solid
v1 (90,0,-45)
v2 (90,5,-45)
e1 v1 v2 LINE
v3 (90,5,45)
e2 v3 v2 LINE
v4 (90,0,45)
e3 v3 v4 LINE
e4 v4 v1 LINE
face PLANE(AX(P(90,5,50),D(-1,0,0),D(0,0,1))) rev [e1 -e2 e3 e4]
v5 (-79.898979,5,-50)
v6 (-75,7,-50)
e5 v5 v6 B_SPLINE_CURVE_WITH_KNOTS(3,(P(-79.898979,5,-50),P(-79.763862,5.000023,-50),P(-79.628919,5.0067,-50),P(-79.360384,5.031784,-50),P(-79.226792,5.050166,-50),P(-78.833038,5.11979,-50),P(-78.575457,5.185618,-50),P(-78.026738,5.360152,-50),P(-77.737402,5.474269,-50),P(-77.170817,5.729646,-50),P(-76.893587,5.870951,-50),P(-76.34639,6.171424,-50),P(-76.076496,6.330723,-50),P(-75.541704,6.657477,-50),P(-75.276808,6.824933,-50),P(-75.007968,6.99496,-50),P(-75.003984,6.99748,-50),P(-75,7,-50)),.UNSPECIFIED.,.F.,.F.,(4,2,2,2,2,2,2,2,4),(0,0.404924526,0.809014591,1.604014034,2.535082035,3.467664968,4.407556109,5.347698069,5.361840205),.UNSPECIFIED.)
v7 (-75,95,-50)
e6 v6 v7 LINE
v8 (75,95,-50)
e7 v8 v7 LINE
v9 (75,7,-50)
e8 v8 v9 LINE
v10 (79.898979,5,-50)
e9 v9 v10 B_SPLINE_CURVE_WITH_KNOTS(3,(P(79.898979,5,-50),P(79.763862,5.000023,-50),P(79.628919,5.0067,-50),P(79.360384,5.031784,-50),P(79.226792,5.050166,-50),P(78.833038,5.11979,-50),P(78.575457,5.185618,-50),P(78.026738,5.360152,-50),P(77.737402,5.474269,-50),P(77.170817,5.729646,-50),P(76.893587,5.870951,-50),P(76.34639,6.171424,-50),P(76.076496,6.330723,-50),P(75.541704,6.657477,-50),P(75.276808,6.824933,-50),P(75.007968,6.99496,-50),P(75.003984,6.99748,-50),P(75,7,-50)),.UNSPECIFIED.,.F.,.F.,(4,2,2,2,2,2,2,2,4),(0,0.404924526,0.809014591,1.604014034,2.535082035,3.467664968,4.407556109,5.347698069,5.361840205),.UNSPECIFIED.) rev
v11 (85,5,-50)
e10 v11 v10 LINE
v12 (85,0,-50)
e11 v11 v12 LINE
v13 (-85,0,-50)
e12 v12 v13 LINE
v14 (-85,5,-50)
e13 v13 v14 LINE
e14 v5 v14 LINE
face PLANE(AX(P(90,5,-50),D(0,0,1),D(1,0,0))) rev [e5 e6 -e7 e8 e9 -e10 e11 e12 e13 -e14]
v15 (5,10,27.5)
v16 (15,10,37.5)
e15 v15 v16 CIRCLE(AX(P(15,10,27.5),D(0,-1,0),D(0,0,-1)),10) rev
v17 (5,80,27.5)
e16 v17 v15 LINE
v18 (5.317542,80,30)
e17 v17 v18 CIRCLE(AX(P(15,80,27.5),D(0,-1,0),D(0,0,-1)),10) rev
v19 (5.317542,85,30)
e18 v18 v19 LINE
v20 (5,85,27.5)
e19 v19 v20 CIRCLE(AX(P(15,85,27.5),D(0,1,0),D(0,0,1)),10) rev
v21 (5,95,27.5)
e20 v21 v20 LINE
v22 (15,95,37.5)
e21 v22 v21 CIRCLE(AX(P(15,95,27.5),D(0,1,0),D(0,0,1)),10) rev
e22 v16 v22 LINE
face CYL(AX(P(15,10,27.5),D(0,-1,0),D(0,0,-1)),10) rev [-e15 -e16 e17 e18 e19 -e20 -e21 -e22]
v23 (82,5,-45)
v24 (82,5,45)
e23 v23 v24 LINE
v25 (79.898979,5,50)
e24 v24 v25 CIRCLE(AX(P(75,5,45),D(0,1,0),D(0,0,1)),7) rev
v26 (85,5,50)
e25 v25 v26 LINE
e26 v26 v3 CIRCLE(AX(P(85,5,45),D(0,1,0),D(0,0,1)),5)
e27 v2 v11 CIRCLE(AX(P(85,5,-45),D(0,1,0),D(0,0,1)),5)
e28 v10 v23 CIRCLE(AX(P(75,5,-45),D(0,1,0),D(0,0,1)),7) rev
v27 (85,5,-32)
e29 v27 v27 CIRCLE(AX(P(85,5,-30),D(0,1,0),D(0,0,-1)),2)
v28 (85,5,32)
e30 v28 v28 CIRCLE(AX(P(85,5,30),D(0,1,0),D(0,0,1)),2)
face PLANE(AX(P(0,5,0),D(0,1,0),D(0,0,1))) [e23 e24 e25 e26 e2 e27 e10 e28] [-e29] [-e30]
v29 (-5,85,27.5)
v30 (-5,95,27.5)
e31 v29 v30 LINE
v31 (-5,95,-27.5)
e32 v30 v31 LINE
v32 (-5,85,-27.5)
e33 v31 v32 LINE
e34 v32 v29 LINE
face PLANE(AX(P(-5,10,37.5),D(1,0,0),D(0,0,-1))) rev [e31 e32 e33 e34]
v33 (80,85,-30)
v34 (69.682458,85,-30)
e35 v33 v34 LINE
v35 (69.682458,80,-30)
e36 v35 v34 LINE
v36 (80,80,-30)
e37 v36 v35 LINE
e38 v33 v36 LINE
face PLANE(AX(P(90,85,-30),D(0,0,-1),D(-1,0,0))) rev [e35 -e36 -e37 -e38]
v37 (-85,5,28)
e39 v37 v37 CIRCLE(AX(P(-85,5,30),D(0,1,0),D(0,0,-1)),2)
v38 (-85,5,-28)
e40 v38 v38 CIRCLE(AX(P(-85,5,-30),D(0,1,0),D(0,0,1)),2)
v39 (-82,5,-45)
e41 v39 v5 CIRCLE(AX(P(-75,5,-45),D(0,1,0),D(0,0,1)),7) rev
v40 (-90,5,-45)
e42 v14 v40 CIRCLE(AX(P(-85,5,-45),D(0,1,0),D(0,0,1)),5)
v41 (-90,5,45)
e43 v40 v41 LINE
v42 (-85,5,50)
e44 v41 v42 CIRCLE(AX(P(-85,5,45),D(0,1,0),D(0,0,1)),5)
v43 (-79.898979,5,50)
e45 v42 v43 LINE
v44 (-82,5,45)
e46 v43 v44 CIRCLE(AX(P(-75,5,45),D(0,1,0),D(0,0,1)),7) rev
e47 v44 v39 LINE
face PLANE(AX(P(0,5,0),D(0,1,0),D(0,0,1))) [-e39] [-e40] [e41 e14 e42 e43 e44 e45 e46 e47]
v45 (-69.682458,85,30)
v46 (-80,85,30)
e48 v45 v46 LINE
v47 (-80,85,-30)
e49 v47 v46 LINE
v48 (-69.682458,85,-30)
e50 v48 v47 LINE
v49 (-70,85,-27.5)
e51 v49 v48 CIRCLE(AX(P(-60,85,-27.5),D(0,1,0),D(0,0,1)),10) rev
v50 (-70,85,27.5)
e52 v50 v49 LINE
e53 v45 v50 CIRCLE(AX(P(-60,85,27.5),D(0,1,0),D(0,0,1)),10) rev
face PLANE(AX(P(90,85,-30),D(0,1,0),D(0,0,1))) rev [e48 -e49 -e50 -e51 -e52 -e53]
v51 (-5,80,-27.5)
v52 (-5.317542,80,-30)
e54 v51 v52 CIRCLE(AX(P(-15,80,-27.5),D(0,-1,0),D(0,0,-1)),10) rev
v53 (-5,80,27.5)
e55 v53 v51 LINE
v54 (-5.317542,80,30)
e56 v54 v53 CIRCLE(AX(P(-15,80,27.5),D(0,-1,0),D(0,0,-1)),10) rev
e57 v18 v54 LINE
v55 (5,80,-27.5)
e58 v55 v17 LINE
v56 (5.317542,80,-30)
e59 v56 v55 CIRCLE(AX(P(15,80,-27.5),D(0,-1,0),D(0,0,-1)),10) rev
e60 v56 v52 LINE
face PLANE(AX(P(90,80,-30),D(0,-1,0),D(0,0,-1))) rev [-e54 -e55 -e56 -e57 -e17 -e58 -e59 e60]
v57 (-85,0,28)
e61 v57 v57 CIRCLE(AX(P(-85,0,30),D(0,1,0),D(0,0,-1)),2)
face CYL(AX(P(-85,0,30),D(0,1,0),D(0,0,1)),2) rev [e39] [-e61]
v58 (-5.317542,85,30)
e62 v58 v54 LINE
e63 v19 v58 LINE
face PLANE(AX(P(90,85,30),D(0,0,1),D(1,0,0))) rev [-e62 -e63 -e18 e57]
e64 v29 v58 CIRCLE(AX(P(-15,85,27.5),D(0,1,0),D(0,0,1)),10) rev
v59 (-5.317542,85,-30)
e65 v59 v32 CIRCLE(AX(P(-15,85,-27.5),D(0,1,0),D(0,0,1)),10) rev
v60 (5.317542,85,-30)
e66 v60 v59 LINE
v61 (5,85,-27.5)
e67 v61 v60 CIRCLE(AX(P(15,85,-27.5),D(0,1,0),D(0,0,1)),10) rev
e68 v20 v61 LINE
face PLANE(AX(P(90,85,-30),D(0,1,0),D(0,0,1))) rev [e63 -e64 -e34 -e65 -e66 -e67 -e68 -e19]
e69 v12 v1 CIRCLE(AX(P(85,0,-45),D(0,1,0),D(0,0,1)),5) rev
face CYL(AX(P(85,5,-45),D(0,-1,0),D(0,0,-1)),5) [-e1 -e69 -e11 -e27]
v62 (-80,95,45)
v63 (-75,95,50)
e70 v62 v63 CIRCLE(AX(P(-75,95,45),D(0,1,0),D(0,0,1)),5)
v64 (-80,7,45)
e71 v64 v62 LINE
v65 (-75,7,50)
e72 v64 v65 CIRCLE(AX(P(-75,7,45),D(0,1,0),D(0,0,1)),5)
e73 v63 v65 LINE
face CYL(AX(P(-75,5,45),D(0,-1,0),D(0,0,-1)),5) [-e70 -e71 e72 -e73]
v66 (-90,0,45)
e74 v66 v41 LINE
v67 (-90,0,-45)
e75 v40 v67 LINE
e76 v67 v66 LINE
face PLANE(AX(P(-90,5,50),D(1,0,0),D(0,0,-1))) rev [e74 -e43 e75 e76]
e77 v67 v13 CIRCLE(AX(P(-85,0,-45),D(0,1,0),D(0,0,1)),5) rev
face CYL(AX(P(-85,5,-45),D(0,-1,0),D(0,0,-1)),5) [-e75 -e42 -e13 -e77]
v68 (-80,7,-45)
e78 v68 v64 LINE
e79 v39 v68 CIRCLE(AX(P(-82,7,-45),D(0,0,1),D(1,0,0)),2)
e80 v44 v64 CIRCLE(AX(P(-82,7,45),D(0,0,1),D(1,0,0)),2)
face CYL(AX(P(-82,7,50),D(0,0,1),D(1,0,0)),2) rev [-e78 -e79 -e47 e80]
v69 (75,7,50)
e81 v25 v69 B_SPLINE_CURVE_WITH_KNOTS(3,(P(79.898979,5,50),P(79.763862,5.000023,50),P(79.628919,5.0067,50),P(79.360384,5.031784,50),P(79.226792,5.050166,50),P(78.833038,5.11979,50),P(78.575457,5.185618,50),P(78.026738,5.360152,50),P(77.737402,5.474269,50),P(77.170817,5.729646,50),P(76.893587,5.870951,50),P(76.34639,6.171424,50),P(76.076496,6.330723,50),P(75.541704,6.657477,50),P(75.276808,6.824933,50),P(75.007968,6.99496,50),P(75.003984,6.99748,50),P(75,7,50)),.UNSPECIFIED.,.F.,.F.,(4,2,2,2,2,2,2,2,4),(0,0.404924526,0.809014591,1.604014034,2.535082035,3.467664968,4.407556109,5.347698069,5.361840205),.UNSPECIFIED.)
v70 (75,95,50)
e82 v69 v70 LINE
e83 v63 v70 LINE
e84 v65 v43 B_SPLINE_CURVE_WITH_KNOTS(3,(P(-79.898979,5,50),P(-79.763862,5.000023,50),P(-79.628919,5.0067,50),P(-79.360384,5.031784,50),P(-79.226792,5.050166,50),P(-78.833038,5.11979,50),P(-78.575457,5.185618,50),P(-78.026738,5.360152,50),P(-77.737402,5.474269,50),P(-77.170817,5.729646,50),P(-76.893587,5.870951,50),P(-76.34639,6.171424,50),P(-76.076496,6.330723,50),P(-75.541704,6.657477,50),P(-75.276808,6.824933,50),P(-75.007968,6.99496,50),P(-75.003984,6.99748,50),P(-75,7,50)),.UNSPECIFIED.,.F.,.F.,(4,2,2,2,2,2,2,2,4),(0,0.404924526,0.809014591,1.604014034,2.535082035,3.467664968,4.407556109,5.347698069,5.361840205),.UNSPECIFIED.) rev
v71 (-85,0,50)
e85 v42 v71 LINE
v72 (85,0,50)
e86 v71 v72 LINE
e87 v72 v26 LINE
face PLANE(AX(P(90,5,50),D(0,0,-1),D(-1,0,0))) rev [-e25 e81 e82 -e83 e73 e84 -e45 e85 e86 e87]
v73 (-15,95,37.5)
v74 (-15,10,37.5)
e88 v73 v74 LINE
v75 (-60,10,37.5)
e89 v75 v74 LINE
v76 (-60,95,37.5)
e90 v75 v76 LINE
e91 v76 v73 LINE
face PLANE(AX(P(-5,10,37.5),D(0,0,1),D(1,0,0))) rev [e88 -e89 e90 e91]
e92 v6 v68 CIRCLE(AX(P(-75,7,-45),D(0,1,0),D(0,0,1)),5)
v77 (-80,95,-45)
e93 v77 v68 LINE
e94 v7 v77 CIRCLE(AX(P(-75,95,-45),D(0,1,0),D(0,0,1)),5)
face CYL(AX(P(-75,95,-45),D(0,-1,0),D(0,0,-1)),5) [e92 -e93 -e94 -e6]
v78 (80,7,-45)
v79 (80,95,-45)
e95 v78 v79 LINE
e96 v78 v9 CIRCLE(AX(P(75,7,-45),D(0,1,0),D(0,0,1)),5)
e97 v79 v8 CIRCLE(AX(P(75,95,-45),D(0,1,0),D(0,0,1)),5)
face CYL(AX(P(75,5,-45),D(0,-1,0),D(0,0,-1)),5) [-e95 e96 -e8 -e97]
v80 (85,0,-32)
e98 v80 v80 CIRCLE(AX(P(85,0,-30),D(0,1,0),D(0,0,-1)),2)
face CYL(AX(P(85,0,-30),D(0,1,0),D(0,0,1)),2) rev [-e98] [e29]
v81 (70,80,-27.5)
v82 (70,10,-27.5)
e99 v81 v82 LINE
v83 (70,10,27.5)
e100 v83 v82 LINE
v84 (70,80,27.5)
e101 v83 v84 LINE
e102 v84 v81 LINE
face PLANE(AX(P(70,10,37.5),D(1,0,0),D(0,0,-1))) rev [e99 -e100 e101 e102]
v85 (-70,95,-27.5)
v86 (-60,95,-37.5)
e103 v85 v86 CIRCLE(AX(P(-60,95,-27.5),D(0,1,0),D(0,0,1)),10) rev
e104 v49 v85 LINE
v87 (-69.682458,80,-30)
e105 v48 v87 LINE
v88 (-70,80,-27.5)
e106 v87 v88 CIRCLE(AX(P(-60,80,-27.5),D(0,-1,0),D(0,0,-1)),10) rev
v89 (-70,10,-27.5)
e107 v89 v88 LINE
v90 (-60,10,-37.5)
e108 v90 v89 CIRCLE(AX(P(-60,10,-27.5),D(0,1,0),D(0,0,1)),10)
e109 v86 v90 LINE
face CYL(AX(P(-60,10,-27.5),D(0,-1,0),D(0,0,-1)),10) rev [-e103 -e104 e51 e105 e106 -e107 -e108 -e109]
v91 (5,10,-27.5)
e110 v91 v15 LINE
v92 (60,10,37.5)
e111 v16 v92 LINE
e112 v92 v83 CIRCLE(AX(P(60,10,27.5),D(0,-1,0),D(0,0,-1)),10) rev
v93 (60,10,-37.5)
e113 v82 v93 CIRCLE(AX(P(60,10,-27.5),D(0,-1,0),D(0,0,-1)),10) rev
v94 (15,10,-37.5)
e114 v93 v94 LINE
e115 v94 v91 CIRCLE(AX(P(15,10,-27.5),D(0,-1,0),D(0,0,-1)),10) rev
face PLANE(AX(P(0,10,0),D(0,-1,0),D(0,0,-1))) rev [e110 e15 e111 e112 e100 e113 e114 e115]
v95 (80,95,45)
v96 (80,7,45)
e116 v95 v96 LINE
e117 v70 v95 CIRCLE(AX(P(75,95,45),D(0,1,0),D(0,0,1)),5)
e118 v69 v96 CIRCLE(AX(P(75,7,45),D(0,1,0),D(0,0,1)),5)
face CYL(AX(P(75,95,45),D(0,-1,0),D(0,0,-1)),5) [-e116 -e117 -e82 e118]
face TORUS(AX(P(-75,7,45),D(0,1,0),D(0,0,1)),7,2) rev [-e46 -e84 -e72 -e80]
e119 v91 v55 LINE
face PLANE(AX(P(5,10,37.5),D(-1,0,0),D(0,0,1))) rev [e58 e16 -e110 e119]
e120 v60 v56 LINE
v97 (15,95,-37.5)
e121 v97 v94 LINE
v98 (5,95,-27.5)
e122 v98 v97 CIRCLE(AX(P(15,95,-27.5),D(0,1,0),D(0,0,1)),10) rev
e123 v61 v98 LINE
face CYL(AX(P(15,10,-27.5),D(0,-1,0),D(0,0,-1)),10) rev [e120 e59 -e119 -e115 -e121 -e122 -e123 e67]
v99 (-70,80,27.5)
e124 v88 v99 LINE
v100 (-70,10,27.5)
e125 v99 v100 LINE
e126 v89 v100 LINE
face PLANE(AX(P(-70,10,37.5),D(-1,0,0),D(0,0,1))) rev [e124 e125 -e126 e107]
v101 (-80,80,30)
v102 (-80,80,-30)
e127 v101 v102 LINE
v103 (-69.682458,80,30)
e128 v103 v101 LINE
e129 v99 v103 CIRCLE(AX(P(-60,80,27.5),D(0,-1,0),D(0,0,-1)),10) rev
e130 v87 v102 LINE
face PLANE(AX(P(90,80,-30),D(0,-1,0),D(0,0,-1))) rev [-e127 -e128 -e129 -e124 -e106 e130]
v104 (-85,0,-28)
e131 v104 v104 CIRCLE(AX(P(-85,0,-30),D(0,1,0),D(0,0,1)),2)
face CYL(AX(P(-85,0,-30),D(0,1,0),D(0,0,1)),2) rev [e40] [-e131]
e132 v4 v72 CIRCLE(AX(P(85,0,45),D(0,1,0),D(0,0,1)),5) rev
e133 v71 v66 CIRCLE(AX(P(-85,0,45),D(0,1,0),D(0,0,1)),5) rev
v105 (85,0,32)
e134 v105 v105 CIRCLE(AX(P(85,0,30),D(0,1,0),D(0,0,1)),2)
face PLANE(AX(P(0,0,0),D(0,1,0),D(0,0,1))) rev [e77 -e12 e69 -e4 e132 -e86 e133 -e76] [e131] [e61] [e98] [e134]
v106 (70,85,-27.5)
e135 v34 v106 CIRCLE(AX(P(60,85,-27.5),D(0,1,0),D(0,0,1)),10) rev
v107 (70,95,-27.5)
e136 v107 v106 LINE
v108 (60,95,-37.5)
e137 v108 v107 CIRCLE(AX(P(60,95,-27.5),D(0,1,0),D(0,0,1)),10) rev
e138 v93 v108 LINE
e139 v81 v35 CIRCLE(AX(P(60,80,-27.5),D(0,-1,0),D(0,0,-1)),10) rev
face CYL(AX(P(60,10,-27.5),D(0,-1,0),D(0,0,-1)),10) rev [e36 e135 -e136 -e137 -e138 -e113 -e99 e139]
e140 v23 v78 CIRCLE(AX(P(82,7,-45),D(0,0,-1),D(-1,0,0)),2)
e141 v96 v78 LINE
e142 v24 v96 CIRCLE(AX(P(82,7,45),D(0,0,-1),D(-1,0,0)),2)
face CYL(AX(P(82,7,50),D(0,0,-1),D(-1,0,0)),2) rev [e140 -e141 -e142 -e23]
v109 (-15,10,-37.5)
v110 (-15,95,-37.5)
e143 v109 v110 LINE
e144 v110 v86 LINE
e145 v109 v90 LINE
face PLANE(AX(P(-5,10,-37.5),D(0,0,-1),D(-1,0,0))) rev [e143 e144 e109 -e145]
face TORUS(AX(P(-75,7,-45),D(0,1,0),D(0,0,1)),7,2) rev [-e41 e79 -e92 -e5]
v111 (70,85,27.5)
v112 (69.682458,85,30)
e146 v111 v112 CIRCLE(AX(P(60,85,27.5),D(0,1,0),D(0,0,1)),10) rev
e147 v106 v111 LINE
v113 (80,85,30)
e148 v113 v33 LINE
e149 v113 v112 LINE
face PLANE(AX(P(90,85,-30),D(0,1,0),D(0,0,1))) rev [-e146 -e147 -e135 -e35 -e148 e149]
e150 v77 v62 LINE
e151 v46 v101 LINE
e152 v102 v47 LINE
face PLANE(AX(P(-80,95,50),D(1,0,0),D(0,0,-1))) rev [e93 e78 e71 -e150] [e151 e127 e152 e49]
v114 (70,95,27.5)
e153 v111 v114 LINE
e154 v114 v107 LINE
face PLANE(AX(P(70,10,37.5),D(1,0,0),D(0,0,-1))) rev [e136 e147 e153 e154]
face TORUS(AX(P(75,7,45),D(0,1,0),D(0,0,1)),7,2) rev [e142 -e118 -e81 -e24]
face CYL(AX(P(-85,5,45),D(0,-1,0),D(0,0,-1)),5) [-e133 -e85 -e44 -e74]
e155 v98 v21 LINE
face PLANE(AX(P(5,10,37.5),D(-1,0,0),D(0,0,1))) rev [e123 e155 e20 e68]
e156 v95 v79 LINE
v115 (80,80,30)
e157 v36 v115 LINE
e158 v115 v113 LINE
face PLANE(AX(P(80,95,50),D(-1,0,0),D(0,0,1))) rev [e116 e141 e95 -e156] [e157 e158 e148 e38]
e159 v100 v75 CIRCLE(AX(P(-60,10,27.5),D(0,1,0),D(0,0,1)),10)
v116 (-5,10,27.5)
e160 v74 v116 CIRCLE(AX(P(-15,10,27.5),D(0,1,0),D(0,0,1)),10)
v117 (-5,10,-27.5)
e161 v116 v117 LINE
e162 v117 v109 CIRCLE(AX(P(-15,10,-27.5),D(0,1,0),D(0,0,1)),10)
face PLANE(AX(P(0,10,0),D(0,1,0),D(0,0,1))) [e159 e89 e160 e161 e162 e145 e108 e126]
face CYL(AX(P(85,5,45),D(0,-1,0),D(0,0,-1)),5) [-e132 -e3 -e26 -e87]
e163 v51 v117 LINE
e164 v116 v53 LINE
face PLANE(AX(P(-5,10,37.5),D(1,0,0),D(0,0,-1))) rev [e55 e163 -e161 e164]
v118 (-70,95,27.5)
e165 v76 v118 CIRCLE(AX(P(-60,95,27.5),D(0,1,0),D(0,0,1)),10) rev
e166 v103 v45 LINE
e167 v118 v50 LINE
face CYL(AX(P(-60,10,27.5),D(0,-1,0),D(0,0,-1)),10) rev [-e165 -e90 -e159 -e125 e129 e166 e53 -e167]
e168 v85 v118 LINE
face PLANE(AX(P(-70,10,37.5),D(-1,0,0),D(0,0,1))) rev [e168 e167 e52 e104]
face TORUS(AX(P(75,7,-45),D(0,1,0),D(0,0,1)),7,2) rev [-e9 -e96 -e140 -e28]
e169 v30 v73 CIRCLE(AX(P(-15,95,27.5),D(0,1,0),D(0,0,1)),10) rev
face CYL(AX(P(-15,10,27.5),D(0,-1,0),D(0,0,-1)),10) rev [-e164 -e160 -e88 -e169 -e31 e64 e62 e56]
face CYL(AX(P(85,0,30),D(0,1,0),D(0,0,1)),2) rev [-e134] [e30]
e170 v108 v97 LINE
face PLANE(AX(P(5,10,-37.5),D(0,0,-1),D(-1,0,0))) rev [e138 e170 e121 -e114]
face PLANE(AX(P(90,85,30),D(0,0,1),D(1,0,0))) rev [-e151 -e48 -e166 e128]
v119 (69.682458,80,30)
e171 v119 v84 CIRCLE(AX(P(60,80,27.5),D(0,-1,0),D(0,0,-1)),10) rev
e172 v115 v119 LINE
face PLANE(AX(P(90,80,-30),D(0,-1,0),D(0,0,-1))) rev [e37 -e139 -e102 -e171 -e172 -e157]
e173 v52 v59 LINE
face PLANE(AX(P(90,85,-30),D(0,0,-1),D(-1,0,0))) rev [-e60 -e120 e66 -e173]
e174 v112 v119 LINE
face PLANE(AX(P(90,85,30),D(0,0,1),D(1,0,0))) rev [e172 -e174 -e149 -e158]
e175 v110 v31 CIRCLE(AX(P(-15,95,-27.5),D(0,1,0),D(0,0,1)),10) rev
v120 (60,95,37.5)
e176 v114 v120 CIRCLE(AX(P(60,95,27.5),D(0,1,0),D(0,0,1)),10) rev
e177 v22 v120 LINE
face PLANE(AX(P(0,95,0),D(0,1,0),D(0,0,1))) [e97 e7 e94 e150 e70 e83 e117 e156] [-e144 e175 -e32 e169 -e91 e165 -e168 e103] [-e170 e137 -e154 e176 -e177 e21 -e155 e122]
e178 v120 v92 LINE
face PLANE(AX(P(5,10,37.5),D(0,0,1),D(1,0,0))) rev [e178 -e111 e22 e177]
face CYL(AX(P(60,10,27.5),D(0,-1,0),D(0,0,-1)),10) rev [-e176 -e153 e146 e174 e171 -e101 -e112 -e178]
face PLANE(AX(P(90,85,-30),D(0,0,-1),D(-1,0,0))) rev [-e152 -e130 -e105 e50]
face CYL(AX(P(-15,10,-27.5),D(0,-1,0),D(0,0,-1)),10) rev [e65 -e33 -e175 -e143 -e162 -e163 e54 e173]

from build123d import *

# Parameters (mm, degrees)
SKETCH1_W               = 180
SKETCH1_H               = 100
BOSS_EXTRUDE1_DEPTH     = 5
SKETCH2_W               = 160
SKETCH2_H               = 100
BOSS_EXTRUDE2_DEPTH     = 90
SKETCH3_R               = 2
CUT_EXTRUDE1_DEPTH      = 137.747943312
FILLET1_R               = 5
FILLET2_R               = 2
SKETCH4_W               = 65
SKETCH4_H               = 75
CUT_EXTRUDE2_DEPTH      = 85
FILLET3_R               = 10
CUT_EXTRUDE3_DEPTH      = 202.059692701
CUT_EXTRUDE3_DEPTH_BACK = 202.059692701
SKETCH5_W               = 60
SKETCH5_H               = 5


with BuildPart() as part:
    # Sketch1 → Boss-Extrude1 (new body)
    with BuildSketch(Plane(origin=(0, 0, 0), x_dir=(1, 0, 0), z_dir=(0, 1, 0))):
        Rectangle(SKETCH1_W, SKETCH1_H)
    extrude(amount=BOSS_EXTRUDE1_DEPTH)

    # Sketch2 → Boss-Extrude2 (add)
    with BuildSketch(Plane(origin=(0, 5, 0), x_dir=(1, 0, 0), z_dir=(0, 1, 0))):
        Rectangle(SKETCH2_W, SKETCH2_H)
    extrude(amount=BOSS_EXTRUDE2_DEPTH)

    # Sketch3 → Cut-Extrude1 (cut, through all)
    with BuildSketch(Plane(origin=(0, 5, 0), x_dir=(1, 0, 0), z_dir=(0, 1, 0))):
        with Locations(Location((-85, 30, 0), (0, 0, 270))):
            Circle(SKETCH3_R)
        with Locations(Location((85, 30, 0), (0, 0, 90))):
            Circle(SKETCH3_R)
        with Locations(Location((85, -30, 0), (0, 0, 270))):
            Circle(SKETCH3_R)
        with Locations(Location((-85, -30, 0), (0, 0, 90))):
            Circle(SKETCH3_R)
    extrude(amount=-CUT_EXTRUDE1_DEPTH, mode=Mode.SUBTRACT)

    # Fillet1
    fillet1_edges = [part.edges().sort_by_distance(p)[0] for p in [
        (-80, 50, -50),
        (-80, 50, 50),
        (80, 50, 50),
        (80, 50, -50),
        (-90, 2.5, -50),
        (90, 2.5, -50),
        (90, 2.5, 50),
        (-90, 2.5, 50),
    ]]
    fillet(fillet1_edges, radius=FILLET1_R)

    # Fillet2
    # the kernel refuses this fillet: 2 mm, written as the material it adds along each edge
    with BuildSketch(Plane(origin=(-80, 5, 45), x_dir=(0, 1, 0), z_dir=(0, 0, -1)), Plane(origin=(80, 5, -45), x_dir=(0, 1, 0), z_dir=(0, 0, 1))) as fillet2_piece_1:
        with BuildLine():
            CenterArc((FILLET2_R, -FILLET2_R), FILLET2_R, 90, 90)
            Line((0, -FILLET2_R), (0, 0))
            Line((0, 0), (FILLET2_R, 0))
        make_face()
    extrude(amount=90)
    with BuildSketch(Plane(origin=(-75, 5, -45), x_dir=(-1, 0, 0), z_dir=(0, 0, 1))) as fillet2_piece_2_section:
        with BuildLine():
            CenterArc((5 + FILLET2_R, -FILLET2_R), FILLET2_R, 90, 90)
            Line((5 + FILLET2_R, 0), (5, 0))
            Line((5, 0), (5, -FILLET2_R))
        make_face()
    fillet2_piece_2 = revolve(axis=Axis((-75, 5, -45), (0, -1, 0)), revolution_arc=147.318795695, mode=Mode.PRIVATE)
    fillet2_piece_2 = split(fillet2_piece_2, bisect_by=Plane(origin=(-78.61306887, 5.526930213, -50), z_dir=(0, 0, 1)), keep=Keep.TOP, mode=Mode.PRIVATE)
    add(fillet2_piece_2)
    with BuildSketch(Plane(origin=(75, 5, -45), x_dir=(1, 0, 0), z_dir=(0, 0, 1))) as fillet2_piece_3_section:
        with BuildLine():
            CenterArc((5 + FILLET2_R, FILLET2_R), FILLET2_R, 180, 90)
            Line((5 + FILLET2_R, 0), (5, 0))
            Line((5, 0), (5, FILLET2_R))
        make_face()
    fillet2_piece_3 = revolve(axis=Axis((75, 5, -45), (0, 1, 0)), revolution_arc=147.318795695, mode=Mode.PRIVATE)
    fillet2_piece_3 = split(fillet2_piece_3, bisect_by=Plane(origin=(78.613069351, 5.526929856, -50), z_dir=(0, 0, 1)), keep=Keep.TOP, mode=Mode.PRIVATE)
    add(fillet2_piece_3)
    with BuildSketch(Plane(origin=(-75, 5, 45), x_dir=(0.8416879607506224, 0, 0.5399642365263265), z_dir=(0.5399642365263265, 0, -0.8416879607506224))) as fillet2_piece_4_section:
        with BuildLine():
            CenterArc((5 + FILLET2_R, -FILLET2_R), FILLET2_R, 90, 90)
            Line((5, -FILLET2_R), (5, 0))
            Line((5, 0), (5 + FILLET2_R, 0))
        make_face()
    fillet2_piece_4 = revolve(axis=Axis((-75, 5, 45), (0, -1, 0)), revolution_arc=147.318795695, mode=Mode.PRIVATE)
    fillet2_piece_4 = split(fillet2_piece_4, bisect_by=Plane(origin=(-78.614624166, 5.52723882, 50), z_dir=(0, 0, -1)), keep=Keep.TOP, mode=Mode.PRIVATE)
    add(fillet2_piece_4)
    with BuildSketch(Plane(origin=(75, 5, 45), x_dir=(-0.8416879607506224, 0, 0.5399642365263265), z_dir=(-0.5399642365263265, 0, -0.8416879607506224))) as fillet2_piece_5_section:
        with BuildLine():
            CenterArc((5 + FILLET2_R, FILLET2_R), FILLET2_R, 180, 90)
            Line((5 + FILLET2_R, 0), (5, 0))
            Line((5, 0), (5, FILLET2_R))
        make_face()
    fillet2_piece_5 = revolve(axis=Axis((75, 5, 45), (0, 1, 0)), revolution_arc=147.318795695, mode=Mode.PRIVATE)
    fillet2_piece_5 = split(fillet2_piece_5, bisect_by=Plane(origin=(78.613068706, 5.526930627, 50), z_dir=(0, 0, -1)), keep=Keep.TOP, mode=Mode.PRIVATE)
    add(fillet2_piece_5)

    # Sketch4 → Cut-Extrude2 (cut)
    with BuildSketch(Plane(origin=(0, 95, 0), x_dir=(1, 0, 0), z_dir=(0, 1, 0))):
        with Locations((-37.5, 0)):
            Rectangle(SKETCH4_W, SKETCH4_H)
        with Locations((37.5, 0)):
            Rectangle(SKETCH4_W, SKETCH4_H)
    extrude(amount=-CUT_EXTRUDE2_DEPTH, mode=Mode.SUBTRACT)

    # Fillet3
    fillet3_edges = [part.edges().sort_by_distance(p)[0] for p in [
        (-70, 52.5, 37.5),
        (-70, 52.5, -37.5),
        (-5, 52.5, -37.5),
        (-5, 52.5, 37.5),
        (5, 52.5, 37.5),
        (5, 52.5, -37.5),
        (70, 52.5, -37.5),
        (70, 52.5, 37.5),
    ]]
    fillet(fillet3_edges, radius=FILLET3_R)

    # Sketch5 → Cut-Extrude3 (cut, two sides: drawn at the far end of the back side and taken through both)
    with BuildSketch(Plane.ZY.offset(80).offset(-CUT_EXTRUDE3_DEPTH_BACK)):
        with Locations((0, 82.5)):
            Rectangle(SKETCH5_W, SKETCH5_H)
    extrude(amount=CUT_EXTRUDE3_DEPTH + CUT_EXTRUDE3_DEPTH_BACK, mode=Mode.SUBTRACT)


solid = part.part
